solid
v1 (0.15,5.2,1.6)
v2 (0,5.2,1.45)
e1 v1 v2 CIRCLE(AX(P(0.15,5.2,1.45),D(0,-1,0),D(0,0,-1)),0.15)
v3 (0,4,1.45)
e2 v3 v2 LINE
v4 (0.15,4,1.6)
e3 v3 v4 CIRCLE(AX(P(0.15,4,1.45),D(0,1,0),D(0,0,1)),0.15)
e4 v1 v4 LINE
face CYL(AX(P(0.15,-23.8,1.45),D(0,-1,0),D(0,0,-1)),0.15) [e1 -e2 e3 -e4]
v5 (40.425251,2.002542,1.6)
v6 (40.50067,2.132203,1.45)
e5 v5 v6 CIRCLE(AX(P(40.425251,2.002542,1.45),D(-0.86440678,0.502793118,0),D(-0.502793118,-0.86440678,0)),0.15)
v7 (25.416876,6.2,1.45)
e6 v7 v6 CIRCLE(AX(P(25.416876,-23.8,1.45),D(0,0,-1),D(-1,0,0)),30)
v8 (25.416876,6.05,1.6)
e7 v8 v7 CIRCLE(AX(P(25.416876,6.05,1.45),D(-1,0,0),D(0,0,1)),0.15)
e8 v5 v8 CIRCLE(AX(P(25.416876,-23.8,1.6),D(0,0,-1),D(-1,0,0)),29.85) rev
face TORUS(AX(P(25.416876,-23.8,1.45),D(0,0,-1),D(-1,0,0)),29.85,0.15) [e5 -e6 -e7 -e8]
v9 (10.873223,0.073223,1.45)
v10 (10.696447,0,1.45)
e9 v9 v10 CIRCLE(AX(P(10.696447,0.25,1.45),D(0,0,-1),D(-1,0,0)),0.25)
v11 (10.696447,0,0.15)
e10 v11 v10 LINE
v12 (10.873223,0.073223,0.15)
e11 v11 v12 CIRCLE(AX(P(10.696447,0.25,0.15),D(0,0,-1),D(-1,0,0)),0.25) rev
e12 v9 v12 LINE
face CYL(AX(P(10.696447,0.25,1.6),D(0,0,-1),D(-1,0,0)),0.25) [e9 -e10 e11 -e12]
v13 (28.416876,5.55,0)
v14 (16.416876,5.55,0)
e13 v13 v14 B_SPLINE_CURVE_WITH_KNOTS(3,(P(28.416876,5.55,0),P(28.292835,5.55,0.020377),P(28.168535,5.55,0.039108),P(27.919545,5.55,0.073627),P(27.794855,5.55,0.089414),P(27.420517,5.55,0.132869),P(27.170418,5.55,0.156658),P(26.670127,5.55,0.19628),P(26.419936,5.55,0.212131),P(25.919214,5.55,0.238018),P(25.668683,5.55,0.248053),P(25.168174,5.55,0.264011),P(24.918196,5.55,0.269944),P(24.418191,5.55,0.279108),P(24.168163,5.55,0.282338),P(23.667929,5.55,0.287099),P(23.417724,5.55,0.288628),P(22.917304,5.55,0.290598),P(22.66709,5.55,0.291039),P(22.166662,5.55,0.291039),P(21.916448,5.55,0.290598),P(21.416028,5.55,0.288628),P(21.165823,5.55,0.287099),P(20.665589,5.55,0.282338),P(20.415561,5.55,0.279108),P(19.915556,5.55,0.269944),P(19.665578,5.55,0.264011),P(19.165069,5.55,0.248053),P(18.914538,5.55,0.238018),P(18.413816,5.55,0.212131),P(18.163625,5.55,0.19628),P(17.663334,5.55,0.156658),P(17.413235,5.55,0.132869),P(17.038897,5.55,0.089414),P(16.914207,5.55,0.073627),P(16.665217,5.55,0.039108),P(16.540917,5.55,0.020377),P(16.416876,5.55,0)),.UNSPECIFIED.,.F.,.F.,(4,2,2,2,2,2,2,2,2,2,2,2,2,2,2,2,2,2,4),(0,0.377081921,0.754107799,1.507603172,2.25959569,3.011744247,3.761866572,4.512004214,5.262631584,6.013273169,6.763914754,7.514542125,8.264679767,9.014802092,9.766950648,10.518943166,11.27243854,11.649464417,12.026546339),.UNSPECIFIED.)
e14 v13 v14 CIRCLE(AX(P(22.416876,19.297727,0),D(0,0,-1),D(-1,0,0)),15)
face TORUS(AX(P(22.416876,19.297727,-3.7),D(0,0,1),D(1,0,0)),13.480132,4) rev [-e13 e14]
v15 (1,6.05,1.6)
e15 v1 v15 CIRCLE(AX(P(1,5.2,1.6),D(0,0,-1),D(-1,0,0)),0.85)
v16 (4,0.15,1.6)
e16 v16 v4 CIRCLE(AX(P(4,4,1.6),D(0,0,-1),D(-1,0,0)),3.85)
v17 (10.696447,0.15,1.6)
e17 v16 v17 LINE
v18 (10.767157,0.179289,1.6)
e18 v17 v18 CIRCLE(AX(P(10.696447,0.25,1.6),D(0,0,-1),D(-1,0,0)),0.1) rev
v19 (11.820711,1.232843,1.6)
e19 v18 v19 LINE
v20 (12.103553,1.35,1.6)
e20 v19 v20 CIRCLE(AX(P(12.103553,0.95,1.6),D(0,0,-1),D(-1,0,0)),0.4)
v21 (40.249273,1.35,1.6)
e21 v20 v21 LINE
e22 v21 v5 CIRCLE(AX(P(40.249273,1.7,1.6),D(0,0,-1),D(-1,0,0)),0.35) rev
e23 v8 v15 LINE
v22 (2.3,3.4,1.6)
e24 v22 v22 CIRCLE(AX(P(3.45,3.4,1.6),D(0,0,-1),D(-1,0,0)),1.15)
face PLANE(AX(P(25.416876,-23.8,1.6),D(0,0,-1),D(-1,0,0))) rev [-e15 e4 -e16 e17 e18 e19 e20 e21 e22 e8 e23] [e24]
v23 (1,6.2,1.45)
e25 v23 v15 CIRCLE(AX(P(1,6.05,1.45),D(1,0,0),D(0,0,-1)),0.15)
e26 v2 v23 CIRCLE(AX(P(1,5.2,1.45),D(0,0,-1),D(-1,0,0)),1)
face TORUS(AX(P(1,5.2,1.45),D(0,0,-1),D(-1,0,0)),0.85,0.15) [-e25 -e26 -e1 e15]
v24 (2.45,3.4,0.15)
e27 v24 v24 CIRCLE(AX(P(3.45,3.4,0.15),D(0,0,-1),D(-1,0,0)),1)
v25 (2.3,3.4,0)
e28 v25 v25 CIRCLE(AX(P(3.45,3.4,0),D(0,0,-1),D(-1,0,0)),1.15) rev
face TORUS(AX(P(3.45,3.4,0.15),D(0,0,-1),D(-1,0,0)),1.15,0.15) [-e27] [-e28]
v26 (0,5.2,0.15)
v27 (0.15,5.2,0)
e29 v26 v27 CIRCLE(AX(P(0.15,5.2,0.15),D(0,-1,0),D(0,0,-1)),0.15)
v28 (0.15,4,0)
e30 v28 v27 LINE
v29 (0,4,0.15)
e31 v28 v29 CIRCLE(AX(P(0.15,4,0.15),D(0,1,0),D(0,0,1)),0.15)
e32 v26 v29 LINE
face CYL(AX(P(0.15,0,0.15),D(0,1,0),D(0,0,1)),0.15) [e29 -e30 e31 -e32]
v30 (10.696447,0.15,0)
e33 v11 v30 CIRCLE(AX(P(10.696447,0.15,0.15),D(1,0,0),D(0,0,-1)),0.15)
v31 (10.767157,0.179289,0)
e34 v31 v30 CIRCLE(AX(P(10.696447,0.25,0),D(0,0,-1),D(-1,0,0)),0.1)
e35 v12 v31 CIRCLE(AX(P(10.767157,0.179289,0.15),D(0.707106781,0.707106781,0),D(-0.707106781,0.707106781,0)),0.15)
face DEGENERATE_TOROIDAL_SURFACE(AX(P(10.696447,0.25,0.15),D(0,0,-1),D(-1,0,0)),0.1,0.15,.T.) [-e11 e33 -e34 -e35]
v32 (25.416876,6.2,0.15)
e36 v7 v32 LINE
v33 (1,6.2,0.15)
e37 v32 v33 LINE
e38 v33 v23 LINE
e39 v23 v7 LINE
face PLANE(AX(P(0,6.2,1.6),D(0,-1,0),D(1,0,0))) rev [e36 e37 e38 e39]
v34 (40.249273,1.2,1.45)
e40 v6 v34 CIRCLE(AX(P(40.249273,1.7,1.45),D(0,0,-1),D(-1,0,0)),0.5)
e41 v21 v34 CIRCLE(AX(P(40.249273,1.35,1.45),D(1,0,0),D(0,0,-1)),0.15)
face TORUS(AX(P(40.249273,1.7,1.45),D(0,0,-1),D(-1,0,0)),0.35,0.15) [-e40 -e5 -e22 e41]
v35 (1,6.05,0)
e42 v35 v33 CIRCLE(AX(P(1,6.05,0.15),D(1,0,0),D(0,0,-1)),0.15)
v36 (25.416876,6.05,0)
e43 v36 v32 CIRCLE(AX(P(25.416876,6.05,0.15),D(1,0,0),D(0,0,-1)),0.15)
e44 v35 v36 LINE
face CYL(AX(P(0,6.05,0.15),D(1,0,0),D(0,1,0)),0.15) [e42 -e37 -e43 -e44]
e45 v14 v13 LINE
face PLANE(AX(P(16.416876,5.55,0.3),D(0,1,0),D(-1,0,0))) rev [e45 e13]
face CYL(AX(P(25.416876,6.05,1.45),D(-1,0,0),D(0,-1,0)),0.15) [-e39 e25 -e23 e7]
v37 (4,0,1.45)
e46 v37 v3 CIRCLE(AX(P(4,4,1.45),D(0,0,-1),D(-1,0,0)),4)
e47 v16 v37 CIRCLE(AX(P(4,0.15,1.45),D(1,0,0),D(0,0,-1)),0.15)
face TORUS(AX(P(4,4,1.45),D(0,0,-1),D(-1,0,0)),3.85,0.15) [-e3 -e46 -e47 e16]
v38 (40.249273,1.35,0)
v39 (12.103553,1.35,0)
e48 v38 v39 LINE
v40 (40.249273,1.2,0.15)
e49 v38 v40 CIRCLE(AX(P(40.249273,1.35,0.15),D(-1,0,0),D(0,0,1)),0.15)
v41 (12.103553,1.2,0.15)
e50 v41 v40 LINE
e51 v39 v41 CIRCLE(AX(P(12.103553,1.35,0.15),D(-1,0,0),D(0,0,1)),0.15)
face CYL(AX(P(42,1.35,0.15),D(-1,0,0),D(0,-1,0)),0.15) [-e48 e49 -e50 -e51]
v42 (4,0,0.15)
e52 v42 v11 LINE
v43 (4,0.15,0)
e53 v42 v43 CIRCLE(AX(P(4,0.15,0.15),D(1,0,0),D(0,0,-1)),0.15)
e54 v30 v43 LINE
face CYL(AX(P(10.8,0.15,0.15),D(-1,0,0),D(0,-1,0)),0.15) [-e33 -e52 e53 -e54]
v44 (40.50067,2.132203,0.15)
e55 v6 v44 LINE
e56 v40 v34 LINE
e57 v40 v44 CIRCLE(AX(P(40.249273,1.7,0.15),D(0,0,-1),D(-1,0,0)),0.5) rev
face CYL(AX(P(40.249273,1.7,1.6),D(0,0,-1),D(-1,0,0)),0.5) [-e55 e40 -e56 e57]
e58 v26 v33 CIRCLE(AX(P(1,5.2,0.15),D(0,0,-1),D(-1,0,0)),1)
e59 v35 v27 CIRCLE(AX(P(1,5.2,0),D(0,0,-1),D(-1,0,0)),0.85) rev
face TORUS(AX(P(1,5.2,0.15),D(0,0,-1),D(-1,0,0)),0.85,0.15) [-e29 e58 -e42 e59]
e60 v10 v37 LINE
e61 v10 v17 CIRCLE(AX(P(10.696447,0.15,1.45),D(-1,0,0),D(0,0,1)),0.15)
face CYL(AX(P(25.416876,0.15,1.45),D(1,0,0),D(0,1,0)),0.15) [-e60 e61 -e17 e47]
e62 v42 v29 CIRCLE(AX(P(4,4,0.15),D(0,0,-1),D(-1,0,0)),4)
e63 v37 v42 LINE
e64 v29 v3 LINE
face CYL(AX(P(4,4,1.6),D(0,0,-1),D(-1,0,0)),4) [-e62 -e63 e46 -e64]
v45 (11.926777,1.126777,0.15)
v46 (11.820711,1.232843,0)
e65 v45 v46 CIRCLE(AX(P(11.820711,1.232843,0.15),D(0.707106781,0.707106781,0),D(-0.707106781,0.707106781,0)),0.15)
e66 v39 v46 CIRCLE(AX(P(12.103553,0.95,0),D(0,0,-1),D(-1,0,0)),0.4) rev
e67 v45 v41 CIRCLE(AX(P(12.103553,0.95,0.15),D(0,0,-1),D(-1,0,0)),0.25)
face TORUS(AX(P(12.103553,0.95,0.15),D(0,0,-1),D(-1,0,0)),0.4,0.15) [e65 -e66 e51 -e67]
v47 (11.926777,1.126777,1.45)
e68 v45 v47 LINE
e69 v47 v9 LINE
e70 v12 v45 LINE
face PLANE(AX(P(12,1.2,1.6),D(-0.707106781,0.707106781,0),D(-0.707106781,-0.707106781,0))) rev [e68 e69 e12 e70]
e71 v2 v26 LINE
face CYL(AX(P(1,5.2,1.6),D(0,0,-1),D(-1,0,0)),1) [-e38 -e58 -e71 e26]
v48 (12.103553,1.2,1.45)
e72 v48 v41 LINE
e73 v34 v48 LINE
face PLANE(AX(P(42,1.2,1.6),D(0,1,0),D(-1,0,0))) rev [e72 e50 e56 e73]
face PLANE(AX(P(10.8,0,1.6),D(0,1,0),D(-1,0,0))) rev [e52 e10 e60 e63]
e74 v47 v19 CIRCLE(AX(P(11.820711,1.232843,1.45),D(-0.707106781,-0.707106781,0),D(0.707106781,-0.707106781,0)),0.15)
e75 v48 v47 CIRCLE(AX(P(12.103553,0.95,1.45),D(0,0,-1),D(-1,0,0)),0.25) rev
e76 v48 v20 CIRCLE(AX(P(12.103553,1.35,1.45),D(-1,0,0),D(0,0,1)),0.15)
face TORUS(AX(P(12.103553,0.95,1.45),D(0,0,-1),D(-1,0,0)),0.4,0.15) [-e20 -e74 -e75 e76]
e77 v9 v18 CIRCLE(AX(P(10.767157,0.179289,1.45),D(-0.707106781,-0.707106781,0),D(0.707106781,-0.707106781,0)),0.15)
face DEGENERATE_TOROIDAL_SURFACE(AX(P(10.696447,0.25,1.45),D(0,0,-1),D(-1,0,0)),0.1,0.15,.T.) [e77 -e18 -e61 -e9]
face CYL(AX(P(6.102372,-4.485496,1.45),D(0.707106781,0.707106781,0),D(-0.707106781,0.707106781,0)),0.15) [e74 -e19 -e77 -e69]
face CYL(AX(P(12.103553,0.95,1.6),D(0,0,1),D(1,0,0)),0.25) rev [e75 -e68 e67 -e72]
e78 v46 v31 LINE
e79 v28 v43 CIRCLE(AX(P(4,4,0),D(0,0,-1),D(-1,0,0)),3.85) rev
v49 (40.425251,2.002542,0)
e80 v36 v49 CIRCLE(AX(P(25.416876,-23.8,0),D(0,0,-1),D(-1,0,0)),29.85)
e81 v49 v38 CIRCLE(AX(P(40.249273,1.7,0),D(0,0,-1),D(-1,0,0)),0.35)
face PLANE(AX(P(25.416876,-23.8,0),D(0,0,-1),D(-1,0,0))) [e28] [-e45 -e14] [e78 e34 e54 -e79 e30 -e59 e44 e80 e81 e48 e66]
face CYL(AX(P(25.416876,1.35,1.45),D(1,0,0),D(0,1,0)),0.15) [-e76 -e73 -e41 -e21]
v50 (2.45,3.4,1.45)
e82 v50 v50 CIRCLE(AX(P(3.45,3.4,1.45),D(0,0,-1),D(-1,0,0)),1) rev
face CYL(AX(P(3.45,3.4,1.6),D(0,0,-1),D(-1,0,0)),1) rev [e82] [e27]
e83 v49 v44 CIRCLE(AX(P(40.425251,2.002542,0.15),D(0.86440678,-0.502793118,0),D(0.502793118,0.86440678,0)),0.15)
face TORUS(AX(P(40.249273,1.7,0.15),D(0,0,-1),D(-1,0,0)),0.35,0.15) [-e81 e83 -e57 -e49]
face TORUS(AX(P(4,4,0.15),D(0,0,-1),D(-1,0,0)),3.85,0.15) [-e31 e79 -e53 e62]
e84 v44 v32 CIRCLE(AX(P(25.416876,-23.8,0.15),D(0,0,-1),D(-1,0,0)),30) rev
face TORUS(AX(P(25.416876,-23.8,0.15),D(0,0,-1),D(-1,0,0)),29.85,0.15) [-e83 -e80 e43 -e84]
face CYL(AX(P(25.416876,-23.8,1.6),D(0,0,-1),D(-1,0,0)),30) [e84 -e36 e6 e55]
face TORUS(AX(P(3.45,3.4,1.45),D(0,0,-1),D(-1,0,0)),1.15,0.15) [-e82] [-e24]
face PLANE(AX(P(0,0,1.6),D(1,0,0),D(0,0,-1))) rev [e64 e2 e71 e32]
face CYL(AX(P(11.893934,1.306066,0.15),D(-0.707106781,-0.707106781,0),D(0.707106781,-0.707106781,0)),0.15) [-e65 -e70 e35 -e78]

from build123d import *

# Parameters (mm, degrees)
BOSS_EXTRUDE1_DEPTH = 1.6
FILLET1_R           = 0.5
FILLET2_R           = 0.25
FILLET3_R           = 0.15
CUT_EXTRUDE1_DEPTH  = 0.3
FILLET4_R           = 4
SKETCH3_R           = 1
CUT_EXTRUDE2_DEPTH  = 42.249281937
FILLET5_R           = 4
FILLET6_R           = 1
FILLET7_R           = 0.15


with BuildPart() as part:
    # Sketch1 → Boss-Extrude1 (new body)
    with BuildSketch(Plane.XY):
        with BuildLine():
            Line((0, 0), (0, 6.2))
            Line((0, 6.2), (25.416876048, 6.2))
            ThreePointArc((25.416876048, 6.2), (34.077130086, 4.922813233), (42, 1.2))
            Line((42, 1.2), (12, 1.2))
            Line((12, 1.2), (10.8, 0))
            Line((10.8, 0), (0, 0))
        make_face()
    extrude(amount=BOSS_EXTRUDE1_DEPTH)

    # Fillet1
    fillet1_edges = [part.edges().sort_by_distance(p)[0] for p in [
        (42, 1.2, 0.8),
    ]]
    fillet(fillet1_edges, radius=FILLET1_R)

    # Fillet2
    fillet2_edges = [part.edges().sort_by_distance(p)[0] for p in [
        (12, 1.2, 0.8),
        (10.8, 0, 0.8),
    ]]
    fillet(fillet2_edges, radius=FILLET2_R)

    # Fillet3
    fillet3_edges = [part.edges().sort_by_distance(p)[0] for p in [
        (12.708438024, 6.2, 1.6),
        (33.228210707, 5.16520414, 0),
        (33.228210707, 5.16520414, 1.6),
        (0, 3.1, 1.6),
        (40.732026425, 1.569811089, 0),
        (40.732026425, 1.569811089, 1.6),
        (11.4, 0.6, 0),
        (11.4, 0.6, 1.6),
        (26.176413207, 1.2, 0),
        (10.792117467, 0.019030117, 0),
        (26.176413207, 1.2, 1.6),
        (10.792117467, 0.019030117, 1.6),
        (12.007882533, 1.180969883, 0),
        (12.007882533, 1.180969883, 1.6),
        (5.348223305, 0, 1.6),
        (0, 3.1, 0),
        (12.708438024, 6.2, 0),
        (5.348223305, 0, 0),
    ]]
    fillet(fillet3_edges, radius=FILLET3_R)

    # Sketch2 → Cut-Extrude1 (cut)
    with BuildSketch(Plane(origin=(0, 0, 0), x_dir=(-1, 0, 0), z_dir=(0, 0, -1))):
        with BuildLine():
            Line((-16.416876048, 5.55), (-28.416876048, 5.55))
            ThreePointArc((-28.416876048, 5.55), (-22.416876048, 4.297727085), (-16.416876048, 5.55))
        make_face()
    extrude(amount=-CUT_EXTRUDE1_DEPTH, mode=Mode.SUBTRACT)

    # Fillet4
    # the kernel refuses this fillet: 4 mm, written as the material it adds along each edge
    with BuildSketch(Plane(origin=(22.416876048, 19.297727085, 0.3), x_dir=(0.6169459509621767, -0.7870055232279983, 0), z_dir=(0.7870055232279983, 0.6169459509621767, 0))) as fillet4_piece_1_section:
        with BuildLine():
            CenterArc((13.480131585, 4), FILLET4_R, 270, 22.331645009)
            Line((13.480131585, 0), (13.480131585, -0.08))
            Line((13.480131585, -0.08), (15, -0.08))
            Line((15, -0.08), (15.08, 0))
            ThreePointArc((15.08, 0), (15.08, 0.15), (15.030397368, 0.226))
            Line((15.030397368, 0.226), (15, 0.3))
        make_face()
    fillet4_piece_1 = revolve(axis=Axis((22.416876048, 19.297727085, 0.3), (0, 0, -1)), revolution_arc=76.186906047, mode=Mode.PRIVATE)
    fillet4_piece_1 = split(fillet4_piece_1, bisect_by=Plane(origin=(22.416876137, 5.55, 0.246369344), z_dir=(0, -1, 0)), keep=Keep.TOP, mode=Mode.PRIVATE)
    add(fillet4_piece_1)

    # Sketch3 → Cut-Extrude2 (cut, through all)
    with BuildSketch(Plane(origin=(0, 0, 0), x_dir=(-1, 0, 0), z_dir=(0, 0, -1))):
        with Locations((-3.45, 3.4)):
            Circle(SKETCH3_R)
    extrude(amount=-CUT_EXTRUDE2_DEPTH, mode=Mode.SUBTRACT)

    # Fillet5
    # the kernel refuses this fillet: 4 mm, written as the material it takes off along each edge
    with BuildSketch(Plane(origin=(4, 4, 0), x_dir=(0, -1, 0), z_dir=(1, 0, 0))) as fillet5_piece_1:
        with BuildLine():
            CenterArc((3.85, -0.15), 0.15, 0, 90)
            Line((4, -0.15), (4, 0))
            Line((4, 0), (3.85, 0))
        make_face()
    revolve(axis=Axis((4, 4, 0), (0, 0, -1)), revolution_arc=90, mode=Mode.SUBTRACT)
    with BuildSketch(Plane(origin=(4, 4, 1.6), x_dir=(-1, 0, 0), z_dir=(0, 1, 0))) as fillet5_piece_2:
        with BuildLine():
            CenterArc((3.85, -0.15), 0.15, 0, 90)
            Line((4, -0.15), (4, 0))
            Line((4, 0), (3.85, 0))
        make_face()
    revolve(axis=Axis((4, 4, 1.6), (0, 0, 1)), revolution_arc=90, mode=Mode.SUBTRACT)
    with BuildSketch(Plane(origin=(0, 0, 0), x_dir=(0, 1, 0), z_dir=(0, 0, 1))) as fillet5_piece_3:
        with BuildLine():
            CenterArc((FILLET5_R, -FILLET5_R), FILLET5_R, 90, 90)
            Line((0, -FILLET5_R), (0, 0))
            Line((0, 0), (FILLET5_R, 0))
        make_face()
    extrude(amount=1.6, mode=Mode.SUBTRACT)

    # Fillet6
    # the kernel refuses this fillet: 1 mm, written as the material it takes off along each edge
    with BuildSketch(Plane(origin=(1, 5.2, 0), x_dir=(-1, 0, 0), z_dir=(0, -1, 0))) as fillet6_piece_1:
        with BuildLine():
            CenterArc((0.85, -0.15), 0.15, 0, 90)
            Line((1, -0.15), (1, 0))
            Line((1, 0), (0.85, 0))
        make_face()
    revolve(axis=Axis((1, 5.2, 0), (0, 0, -1)), revolution_arc=90, mode=Mode.SUBTRACT)
    with BuildSketch(Plane(origin=(1, 5.2, 1.6), x_dir=(0, 1, 0), z_dir=(1, 0, 0))) as fillet6_piece_2:
        with BuildLine():
            CenterArc((0.85, -0.15), 0.15, 0, 90)
            Line((1, -0.15), (1, 0))
            Line((1, 0), (0.85, 0))
        make_face()
    revolve(axis=Axis((1, 5.2, 1.6), (0, 0, 1)), revolution_arc=90, mode=Mode.SUBTRACT)
    with BuildSketch(Plane(origin=(0, 6.2, 0), x_dir=(0, -1, 0), z_dir=(0, 0, 1))) as fillet6_piece_3:
        with BuildLine():
            CenterArc((FILLET6_R, FILLET6_R), FILLET6_R, 180, 90)
            Line((0, FILLET6_R), (0, 0))
            Line((0, 0), (FILLET6_R, 0))
        make_face()
    extrude(amount=1.6, mode=Mode.SUBTRACT)

    # Fillet7
    fillet7_edges = [part.edges().sort_by_distance(p)[0] for p in [
        (4.45, 3.4, 1.6),
        (4.45, 3.4, 0),
    ]]
    fillet(fillet7_edges, radius=FILLET7_R)


solid = part.part
